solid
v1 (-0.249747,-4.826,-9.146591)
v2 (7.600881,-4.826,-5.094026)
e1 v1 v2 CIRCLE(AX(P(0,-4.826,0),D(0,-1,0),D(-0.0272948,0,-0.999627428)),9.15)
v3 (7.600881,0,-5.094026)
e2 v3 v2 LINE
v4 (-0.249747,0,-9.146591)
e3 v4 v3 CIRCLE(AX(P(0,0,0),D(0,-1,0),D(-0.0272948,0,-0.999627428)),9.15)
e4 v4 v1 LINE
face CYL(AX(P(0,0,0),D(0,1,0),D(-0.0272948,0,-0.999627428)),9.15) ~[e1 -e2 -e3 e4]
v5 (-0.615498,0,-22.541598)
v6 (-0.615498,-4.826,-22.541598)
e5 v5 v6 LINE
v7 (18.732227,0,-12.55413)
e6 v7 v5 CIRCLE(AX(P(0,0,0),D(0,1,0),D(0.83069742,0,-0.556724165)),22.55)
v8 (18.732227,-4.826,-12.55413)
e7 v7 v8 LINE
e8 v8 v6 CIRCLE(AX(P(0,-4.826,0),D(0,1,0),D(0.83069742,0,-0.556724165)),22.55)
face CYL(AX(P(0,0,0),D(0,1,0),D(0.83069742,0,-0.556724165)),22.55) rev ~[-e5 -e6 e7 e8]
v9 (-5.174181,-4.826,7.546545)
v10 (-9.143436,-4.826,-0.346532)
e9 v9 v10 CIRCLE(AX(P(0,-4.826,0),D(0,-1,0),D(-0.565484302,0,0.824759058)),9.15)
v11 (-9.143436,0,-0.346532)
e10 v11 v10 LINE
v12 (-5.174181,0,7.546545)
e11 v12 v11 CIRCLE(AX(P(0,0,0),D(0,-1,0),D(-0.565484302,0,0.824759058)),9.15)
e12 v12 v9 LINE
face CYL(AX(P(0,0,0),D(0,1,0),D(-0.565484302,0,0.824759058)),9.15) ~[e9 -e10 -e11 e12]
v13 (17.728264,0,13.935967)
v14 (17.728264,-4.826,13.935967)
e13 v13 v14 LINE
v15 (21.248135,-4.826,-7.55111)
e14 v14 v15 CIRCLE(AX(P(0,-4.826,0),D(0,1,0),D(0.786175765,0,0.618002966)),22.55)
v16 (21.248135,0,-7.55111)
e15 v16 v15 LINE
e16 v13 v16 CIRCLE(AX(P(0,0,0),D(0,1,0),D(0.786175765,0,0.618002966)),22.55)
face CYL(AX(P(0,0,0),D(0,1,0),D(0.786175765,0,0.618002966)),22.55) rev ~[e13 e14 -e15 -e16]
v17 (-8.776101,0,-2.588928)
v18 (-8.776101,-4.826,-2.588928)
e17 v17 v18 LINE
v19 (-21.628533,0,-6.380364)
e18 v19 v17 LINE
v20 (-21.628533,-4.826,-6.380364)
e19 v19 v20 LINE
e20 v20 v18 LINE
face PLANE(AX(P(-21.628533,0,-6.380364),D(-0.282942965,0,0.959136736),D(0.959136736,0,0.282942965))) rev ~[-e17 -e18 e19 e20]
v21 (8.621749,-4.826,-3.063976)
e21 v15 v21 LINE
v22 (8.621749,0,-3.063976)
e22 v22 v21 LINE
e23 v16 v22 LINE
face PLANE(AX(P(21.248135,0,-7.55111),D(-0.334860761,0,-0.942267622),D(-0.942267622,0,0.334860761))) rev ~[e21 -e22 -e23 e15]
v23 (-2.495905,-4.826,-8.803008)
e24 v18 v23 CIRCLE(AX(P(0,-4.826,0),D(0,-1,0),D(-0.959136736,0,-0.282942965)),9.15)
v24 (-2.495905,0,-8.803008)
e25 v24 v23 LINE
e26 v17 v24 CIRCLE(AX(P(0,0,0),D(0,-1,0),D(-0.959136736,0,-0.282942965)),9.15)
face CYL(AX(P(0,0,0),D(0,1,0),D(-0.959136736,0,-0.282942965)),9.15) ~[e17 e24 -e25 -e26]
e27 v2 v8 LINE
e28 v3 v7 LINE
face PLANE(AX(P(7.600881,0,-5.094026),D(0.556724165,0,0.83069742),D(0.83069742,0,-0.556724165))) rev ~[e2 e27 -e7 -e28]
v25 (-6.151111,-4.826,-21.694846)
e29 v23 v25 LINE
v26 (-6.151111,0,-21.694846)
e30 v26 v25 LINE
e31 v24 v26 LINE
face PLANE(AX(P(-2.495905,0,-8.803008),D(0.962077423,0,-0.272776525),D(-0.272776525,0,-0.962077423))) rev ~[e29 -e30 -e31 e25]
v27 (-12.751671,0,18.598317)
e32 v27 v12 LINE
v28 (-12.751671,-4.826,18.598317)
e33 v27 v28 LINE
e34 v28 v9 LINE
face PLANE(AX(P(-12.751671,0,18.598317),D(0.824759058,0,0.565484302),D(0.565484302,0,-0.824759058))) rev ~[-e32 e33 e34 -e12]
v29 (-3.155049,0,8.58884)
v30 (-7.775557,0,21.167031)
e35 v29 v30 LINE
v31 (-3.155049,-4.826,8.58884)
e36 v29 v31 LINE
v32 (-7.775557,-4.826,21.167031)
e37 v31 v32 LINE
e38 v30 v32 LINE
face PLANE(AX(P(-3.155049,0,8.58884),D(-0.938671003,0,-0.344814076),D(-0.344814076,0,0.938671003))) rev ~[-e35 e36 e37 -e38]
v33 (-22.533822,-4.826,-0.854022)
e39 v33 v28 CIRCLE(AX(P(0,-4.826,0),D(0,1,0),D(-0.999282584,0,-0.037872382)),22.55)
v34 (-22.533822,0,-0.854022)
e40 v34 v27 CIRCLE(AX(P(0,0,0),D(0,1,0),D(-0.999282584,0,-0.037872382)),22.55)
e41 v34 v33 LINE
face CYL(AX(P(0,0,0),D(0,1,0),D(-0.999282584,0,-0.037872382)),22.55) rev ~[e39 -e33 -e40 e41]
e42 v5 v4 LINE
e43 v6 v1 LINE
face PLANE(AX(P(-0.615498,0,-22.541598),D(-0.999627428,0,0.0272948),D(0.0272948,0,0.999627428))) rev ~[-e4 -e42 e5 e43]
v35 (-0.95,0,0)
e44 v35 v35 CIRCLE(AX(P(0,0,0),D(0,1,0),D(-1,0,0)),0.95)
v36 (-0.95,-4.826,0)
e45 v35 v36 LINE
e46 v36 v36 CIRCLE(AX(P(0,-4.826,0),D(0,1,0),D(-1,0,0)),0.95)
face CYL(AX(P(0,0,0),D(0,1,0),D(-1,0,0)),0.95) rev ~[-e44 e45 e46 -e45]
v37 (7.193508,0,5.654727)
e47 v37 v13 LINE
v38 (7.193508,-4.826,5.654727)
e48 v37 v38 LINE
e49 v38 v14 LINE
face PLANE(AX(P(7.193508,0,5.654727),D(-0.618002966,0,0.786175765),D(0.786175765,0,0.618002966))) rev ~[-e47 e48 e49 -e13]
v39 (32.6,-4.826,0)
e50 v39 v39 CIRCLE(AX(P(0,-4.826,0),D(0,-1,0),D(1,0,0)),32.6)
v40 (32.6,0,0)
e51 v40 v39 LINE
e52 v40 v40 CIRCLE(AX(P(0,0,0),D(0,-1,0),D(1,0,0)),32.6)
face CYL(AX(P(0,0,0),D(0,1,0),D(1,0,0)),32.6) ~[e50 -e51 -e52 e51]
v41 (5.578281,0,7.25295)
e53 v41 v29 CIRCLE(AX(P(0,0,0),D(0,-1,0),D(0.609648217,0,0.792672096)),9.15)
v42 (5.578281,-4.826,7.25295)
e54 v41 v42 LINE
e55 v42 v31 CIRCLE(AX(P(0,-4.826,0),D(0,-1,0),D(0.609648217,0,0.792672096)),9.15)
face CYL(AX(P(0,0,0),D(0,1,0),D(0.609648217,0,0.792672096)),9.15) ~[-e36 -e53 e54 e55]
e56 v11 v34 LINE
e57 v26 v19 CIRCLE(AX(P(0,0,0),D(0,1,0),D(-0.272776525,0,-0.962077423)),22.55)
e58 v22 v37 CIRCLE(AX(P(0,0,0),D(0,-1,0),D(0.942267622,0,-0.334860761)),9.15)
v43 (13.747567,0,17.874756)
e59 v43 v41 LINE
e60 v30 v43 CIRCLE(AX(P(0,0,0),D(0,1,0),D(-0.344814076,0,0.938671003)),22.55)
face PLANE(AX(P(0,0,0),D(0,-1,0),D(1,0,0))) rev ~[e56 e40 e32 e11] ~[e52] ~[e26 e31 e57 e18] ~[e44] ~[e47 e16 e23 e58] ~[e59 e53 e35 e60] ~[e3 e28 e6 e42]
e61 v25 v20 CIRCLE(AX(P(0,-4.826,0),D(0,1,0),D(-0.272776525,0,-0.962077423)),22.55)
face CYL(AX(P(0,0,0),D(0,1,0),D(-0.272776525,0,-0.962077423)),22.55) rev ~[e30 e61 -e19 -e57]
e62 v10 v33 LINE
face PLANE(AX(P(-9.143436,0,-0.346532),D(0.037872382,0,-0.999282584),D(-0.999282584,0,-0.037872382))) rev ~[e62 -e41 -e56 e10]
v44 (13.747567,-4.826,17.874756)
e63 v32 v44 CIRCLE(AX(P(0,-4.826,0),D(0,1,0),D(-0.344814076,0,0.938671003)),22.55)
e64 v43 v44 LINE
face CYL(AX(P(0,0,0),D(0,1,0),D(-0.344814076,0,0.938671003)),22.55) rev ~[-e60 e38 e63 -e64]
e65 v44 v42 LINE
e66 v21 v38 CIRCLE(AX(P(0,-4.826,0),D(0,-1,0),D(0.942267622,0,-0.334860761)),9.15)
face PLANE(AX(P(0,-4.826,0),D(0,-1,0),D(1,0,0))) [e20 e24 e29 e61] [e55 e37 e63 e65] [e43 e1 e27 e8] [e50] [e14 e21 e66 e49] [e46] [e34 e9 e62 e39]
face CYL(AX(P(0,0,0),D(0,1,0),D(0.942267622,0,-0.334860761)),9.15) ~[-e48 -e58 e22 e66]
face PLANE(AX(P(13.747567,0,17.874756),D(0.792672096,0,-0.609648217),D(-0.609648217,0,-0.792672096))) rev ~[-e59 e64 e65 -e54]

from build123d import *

# Parameters (mm, degrees)
F0_R     = 32.6
F1_DEPTH = 4.826
F2_R     = 2.45
F3_DEPTH = 25
F4_R     = 4.5746249326
F5_DEPTH = 4.826
F6_R     = 0.95
F7_DEPTH = 6.7


# Not quite as in the source:
# - a feature names something its author has since deleted; it is built from what else it names


with BuildPart() as f1:
    # F0 (on Front) → F1 (new body)
    with BuildSketch(Plane.XZ):
        Circle(F0_R)
        with BuildLine():
            ThreePointArc((-6.1511106358, -21.6948458844), (-15.8606587348, -16.0294106098), (-21.6285333971, -6.3803638683))
            Line((-21.6285333971, -6.3803638683), (-8.7761011345, -2.5889281328))
            ThreePointArc((-8.7761011345, -2.5889281328), (-6.435699664, -6.5041732629), (-2.4959052026, -8.8030084187))
            Line((-2.4959052026, -8.8030084187), (-6.1511106358, -21.6948458844))
        make_face(mode=Mode.SUBTRACT)
        with BuildLine():
            ThreePointArc((18.7322268276, -12.5541299212), (10.3436623217, -20.0377431307), (-0.6154977498, -22.5415984908))
            Line((-0.6154977498, -22.5415984908), (-0.249747424, -9.1465909619))
            ThreePointArc((-0.249747424, -9.1465909619), (4.197095798, -8.130614175), (7.6008813957, -5.09402611))
            Line((7.6008813957, -5.09402611), (18.7322268276, -12.5541299212))
        make_face(mode=Mode.SUBTRACT)
        with BuildLine():
            Line((-12.7516710164, 18.5983167596), (-5.1741813659, 7.5465453814))
            ThreePointArc((-5.1741813659, 7.5465453814), (-8.1745769317, 4.1108140298), (-9.1434356436, -0.3465322961))
            Line((-9.1434356436, -0.3465322961), (-22.5338222691, -0.854022216))
            ThreePointArc((-22.5338222691, -0.854022216), (-20.1460885038, 10.1310225543), (-12.7516710164, 18.5983167596))
        make_face(mode=Mode.SUBTRACT)
        with BuildLine():
            ThreePointArc((17.7282635002, 13.9359668938), (22.2533936178, 3.6454042971), (21.2481348677, -7.5511101598))
            Line((21.2481348677, -7.5511101598), (8.6217487379, -3.0639759628))
            ThreePointArc((8.6217487379, -3.0639759628), (9.0296475212, 1.4791773534), (7.1935082495, 5.6547271432))
            Line((7.1935082495, 5.6547271432), (17.7282635002, 13.9359668938))
        make_face(mode=Mode.SUBTRACT)
        with BuildLine():
            Line((-3.1550487991, 8.5888396815), (-7.7755574229, 21.1670311277))
            ThreePointArc((-7.7755574229, 21.1670311277), (3.4096912991, 22.2907268891), (13.7475672956, 17.8747557593))
            Line((13.7475672956, 17.8747557593), (5.5782811865, 7.2529496762))
            ThreePointArc((5.5782811865, 7.2529496762), (1.3835332766, 9.0447960548), (-3.1550487991, 8.5888396815))
        make_face(mode=Mode.SUBTRACT)
    extrude(amount=F1_DEPTH)

    # F2 (on Front) → F3 (cut, symmetric)
    with BuildSketch(Plane.XZ):
        Circle(F2_R)
    extrude(amount=F3_DEPTH, both=True, mode=Mode.SUBTRACT)

    # F4 (on Front) → F5 (join)
    with BuildSketch(Plane.XZ):
        Circle(F4_R)
    extrude(amount=F5_DEPTH)

    # F6 (on face) → F7 (cut)
    with BuildSketch(Plane(origin=(0, 0, 0), x_dir=(-1, 0, 0), z_dir=(0, 1, 0))):
        Circle(F6_R)
    extrude(amount=-F7_DEPTH, mode=Mode.SUBTRACT)


solid = f1.part
